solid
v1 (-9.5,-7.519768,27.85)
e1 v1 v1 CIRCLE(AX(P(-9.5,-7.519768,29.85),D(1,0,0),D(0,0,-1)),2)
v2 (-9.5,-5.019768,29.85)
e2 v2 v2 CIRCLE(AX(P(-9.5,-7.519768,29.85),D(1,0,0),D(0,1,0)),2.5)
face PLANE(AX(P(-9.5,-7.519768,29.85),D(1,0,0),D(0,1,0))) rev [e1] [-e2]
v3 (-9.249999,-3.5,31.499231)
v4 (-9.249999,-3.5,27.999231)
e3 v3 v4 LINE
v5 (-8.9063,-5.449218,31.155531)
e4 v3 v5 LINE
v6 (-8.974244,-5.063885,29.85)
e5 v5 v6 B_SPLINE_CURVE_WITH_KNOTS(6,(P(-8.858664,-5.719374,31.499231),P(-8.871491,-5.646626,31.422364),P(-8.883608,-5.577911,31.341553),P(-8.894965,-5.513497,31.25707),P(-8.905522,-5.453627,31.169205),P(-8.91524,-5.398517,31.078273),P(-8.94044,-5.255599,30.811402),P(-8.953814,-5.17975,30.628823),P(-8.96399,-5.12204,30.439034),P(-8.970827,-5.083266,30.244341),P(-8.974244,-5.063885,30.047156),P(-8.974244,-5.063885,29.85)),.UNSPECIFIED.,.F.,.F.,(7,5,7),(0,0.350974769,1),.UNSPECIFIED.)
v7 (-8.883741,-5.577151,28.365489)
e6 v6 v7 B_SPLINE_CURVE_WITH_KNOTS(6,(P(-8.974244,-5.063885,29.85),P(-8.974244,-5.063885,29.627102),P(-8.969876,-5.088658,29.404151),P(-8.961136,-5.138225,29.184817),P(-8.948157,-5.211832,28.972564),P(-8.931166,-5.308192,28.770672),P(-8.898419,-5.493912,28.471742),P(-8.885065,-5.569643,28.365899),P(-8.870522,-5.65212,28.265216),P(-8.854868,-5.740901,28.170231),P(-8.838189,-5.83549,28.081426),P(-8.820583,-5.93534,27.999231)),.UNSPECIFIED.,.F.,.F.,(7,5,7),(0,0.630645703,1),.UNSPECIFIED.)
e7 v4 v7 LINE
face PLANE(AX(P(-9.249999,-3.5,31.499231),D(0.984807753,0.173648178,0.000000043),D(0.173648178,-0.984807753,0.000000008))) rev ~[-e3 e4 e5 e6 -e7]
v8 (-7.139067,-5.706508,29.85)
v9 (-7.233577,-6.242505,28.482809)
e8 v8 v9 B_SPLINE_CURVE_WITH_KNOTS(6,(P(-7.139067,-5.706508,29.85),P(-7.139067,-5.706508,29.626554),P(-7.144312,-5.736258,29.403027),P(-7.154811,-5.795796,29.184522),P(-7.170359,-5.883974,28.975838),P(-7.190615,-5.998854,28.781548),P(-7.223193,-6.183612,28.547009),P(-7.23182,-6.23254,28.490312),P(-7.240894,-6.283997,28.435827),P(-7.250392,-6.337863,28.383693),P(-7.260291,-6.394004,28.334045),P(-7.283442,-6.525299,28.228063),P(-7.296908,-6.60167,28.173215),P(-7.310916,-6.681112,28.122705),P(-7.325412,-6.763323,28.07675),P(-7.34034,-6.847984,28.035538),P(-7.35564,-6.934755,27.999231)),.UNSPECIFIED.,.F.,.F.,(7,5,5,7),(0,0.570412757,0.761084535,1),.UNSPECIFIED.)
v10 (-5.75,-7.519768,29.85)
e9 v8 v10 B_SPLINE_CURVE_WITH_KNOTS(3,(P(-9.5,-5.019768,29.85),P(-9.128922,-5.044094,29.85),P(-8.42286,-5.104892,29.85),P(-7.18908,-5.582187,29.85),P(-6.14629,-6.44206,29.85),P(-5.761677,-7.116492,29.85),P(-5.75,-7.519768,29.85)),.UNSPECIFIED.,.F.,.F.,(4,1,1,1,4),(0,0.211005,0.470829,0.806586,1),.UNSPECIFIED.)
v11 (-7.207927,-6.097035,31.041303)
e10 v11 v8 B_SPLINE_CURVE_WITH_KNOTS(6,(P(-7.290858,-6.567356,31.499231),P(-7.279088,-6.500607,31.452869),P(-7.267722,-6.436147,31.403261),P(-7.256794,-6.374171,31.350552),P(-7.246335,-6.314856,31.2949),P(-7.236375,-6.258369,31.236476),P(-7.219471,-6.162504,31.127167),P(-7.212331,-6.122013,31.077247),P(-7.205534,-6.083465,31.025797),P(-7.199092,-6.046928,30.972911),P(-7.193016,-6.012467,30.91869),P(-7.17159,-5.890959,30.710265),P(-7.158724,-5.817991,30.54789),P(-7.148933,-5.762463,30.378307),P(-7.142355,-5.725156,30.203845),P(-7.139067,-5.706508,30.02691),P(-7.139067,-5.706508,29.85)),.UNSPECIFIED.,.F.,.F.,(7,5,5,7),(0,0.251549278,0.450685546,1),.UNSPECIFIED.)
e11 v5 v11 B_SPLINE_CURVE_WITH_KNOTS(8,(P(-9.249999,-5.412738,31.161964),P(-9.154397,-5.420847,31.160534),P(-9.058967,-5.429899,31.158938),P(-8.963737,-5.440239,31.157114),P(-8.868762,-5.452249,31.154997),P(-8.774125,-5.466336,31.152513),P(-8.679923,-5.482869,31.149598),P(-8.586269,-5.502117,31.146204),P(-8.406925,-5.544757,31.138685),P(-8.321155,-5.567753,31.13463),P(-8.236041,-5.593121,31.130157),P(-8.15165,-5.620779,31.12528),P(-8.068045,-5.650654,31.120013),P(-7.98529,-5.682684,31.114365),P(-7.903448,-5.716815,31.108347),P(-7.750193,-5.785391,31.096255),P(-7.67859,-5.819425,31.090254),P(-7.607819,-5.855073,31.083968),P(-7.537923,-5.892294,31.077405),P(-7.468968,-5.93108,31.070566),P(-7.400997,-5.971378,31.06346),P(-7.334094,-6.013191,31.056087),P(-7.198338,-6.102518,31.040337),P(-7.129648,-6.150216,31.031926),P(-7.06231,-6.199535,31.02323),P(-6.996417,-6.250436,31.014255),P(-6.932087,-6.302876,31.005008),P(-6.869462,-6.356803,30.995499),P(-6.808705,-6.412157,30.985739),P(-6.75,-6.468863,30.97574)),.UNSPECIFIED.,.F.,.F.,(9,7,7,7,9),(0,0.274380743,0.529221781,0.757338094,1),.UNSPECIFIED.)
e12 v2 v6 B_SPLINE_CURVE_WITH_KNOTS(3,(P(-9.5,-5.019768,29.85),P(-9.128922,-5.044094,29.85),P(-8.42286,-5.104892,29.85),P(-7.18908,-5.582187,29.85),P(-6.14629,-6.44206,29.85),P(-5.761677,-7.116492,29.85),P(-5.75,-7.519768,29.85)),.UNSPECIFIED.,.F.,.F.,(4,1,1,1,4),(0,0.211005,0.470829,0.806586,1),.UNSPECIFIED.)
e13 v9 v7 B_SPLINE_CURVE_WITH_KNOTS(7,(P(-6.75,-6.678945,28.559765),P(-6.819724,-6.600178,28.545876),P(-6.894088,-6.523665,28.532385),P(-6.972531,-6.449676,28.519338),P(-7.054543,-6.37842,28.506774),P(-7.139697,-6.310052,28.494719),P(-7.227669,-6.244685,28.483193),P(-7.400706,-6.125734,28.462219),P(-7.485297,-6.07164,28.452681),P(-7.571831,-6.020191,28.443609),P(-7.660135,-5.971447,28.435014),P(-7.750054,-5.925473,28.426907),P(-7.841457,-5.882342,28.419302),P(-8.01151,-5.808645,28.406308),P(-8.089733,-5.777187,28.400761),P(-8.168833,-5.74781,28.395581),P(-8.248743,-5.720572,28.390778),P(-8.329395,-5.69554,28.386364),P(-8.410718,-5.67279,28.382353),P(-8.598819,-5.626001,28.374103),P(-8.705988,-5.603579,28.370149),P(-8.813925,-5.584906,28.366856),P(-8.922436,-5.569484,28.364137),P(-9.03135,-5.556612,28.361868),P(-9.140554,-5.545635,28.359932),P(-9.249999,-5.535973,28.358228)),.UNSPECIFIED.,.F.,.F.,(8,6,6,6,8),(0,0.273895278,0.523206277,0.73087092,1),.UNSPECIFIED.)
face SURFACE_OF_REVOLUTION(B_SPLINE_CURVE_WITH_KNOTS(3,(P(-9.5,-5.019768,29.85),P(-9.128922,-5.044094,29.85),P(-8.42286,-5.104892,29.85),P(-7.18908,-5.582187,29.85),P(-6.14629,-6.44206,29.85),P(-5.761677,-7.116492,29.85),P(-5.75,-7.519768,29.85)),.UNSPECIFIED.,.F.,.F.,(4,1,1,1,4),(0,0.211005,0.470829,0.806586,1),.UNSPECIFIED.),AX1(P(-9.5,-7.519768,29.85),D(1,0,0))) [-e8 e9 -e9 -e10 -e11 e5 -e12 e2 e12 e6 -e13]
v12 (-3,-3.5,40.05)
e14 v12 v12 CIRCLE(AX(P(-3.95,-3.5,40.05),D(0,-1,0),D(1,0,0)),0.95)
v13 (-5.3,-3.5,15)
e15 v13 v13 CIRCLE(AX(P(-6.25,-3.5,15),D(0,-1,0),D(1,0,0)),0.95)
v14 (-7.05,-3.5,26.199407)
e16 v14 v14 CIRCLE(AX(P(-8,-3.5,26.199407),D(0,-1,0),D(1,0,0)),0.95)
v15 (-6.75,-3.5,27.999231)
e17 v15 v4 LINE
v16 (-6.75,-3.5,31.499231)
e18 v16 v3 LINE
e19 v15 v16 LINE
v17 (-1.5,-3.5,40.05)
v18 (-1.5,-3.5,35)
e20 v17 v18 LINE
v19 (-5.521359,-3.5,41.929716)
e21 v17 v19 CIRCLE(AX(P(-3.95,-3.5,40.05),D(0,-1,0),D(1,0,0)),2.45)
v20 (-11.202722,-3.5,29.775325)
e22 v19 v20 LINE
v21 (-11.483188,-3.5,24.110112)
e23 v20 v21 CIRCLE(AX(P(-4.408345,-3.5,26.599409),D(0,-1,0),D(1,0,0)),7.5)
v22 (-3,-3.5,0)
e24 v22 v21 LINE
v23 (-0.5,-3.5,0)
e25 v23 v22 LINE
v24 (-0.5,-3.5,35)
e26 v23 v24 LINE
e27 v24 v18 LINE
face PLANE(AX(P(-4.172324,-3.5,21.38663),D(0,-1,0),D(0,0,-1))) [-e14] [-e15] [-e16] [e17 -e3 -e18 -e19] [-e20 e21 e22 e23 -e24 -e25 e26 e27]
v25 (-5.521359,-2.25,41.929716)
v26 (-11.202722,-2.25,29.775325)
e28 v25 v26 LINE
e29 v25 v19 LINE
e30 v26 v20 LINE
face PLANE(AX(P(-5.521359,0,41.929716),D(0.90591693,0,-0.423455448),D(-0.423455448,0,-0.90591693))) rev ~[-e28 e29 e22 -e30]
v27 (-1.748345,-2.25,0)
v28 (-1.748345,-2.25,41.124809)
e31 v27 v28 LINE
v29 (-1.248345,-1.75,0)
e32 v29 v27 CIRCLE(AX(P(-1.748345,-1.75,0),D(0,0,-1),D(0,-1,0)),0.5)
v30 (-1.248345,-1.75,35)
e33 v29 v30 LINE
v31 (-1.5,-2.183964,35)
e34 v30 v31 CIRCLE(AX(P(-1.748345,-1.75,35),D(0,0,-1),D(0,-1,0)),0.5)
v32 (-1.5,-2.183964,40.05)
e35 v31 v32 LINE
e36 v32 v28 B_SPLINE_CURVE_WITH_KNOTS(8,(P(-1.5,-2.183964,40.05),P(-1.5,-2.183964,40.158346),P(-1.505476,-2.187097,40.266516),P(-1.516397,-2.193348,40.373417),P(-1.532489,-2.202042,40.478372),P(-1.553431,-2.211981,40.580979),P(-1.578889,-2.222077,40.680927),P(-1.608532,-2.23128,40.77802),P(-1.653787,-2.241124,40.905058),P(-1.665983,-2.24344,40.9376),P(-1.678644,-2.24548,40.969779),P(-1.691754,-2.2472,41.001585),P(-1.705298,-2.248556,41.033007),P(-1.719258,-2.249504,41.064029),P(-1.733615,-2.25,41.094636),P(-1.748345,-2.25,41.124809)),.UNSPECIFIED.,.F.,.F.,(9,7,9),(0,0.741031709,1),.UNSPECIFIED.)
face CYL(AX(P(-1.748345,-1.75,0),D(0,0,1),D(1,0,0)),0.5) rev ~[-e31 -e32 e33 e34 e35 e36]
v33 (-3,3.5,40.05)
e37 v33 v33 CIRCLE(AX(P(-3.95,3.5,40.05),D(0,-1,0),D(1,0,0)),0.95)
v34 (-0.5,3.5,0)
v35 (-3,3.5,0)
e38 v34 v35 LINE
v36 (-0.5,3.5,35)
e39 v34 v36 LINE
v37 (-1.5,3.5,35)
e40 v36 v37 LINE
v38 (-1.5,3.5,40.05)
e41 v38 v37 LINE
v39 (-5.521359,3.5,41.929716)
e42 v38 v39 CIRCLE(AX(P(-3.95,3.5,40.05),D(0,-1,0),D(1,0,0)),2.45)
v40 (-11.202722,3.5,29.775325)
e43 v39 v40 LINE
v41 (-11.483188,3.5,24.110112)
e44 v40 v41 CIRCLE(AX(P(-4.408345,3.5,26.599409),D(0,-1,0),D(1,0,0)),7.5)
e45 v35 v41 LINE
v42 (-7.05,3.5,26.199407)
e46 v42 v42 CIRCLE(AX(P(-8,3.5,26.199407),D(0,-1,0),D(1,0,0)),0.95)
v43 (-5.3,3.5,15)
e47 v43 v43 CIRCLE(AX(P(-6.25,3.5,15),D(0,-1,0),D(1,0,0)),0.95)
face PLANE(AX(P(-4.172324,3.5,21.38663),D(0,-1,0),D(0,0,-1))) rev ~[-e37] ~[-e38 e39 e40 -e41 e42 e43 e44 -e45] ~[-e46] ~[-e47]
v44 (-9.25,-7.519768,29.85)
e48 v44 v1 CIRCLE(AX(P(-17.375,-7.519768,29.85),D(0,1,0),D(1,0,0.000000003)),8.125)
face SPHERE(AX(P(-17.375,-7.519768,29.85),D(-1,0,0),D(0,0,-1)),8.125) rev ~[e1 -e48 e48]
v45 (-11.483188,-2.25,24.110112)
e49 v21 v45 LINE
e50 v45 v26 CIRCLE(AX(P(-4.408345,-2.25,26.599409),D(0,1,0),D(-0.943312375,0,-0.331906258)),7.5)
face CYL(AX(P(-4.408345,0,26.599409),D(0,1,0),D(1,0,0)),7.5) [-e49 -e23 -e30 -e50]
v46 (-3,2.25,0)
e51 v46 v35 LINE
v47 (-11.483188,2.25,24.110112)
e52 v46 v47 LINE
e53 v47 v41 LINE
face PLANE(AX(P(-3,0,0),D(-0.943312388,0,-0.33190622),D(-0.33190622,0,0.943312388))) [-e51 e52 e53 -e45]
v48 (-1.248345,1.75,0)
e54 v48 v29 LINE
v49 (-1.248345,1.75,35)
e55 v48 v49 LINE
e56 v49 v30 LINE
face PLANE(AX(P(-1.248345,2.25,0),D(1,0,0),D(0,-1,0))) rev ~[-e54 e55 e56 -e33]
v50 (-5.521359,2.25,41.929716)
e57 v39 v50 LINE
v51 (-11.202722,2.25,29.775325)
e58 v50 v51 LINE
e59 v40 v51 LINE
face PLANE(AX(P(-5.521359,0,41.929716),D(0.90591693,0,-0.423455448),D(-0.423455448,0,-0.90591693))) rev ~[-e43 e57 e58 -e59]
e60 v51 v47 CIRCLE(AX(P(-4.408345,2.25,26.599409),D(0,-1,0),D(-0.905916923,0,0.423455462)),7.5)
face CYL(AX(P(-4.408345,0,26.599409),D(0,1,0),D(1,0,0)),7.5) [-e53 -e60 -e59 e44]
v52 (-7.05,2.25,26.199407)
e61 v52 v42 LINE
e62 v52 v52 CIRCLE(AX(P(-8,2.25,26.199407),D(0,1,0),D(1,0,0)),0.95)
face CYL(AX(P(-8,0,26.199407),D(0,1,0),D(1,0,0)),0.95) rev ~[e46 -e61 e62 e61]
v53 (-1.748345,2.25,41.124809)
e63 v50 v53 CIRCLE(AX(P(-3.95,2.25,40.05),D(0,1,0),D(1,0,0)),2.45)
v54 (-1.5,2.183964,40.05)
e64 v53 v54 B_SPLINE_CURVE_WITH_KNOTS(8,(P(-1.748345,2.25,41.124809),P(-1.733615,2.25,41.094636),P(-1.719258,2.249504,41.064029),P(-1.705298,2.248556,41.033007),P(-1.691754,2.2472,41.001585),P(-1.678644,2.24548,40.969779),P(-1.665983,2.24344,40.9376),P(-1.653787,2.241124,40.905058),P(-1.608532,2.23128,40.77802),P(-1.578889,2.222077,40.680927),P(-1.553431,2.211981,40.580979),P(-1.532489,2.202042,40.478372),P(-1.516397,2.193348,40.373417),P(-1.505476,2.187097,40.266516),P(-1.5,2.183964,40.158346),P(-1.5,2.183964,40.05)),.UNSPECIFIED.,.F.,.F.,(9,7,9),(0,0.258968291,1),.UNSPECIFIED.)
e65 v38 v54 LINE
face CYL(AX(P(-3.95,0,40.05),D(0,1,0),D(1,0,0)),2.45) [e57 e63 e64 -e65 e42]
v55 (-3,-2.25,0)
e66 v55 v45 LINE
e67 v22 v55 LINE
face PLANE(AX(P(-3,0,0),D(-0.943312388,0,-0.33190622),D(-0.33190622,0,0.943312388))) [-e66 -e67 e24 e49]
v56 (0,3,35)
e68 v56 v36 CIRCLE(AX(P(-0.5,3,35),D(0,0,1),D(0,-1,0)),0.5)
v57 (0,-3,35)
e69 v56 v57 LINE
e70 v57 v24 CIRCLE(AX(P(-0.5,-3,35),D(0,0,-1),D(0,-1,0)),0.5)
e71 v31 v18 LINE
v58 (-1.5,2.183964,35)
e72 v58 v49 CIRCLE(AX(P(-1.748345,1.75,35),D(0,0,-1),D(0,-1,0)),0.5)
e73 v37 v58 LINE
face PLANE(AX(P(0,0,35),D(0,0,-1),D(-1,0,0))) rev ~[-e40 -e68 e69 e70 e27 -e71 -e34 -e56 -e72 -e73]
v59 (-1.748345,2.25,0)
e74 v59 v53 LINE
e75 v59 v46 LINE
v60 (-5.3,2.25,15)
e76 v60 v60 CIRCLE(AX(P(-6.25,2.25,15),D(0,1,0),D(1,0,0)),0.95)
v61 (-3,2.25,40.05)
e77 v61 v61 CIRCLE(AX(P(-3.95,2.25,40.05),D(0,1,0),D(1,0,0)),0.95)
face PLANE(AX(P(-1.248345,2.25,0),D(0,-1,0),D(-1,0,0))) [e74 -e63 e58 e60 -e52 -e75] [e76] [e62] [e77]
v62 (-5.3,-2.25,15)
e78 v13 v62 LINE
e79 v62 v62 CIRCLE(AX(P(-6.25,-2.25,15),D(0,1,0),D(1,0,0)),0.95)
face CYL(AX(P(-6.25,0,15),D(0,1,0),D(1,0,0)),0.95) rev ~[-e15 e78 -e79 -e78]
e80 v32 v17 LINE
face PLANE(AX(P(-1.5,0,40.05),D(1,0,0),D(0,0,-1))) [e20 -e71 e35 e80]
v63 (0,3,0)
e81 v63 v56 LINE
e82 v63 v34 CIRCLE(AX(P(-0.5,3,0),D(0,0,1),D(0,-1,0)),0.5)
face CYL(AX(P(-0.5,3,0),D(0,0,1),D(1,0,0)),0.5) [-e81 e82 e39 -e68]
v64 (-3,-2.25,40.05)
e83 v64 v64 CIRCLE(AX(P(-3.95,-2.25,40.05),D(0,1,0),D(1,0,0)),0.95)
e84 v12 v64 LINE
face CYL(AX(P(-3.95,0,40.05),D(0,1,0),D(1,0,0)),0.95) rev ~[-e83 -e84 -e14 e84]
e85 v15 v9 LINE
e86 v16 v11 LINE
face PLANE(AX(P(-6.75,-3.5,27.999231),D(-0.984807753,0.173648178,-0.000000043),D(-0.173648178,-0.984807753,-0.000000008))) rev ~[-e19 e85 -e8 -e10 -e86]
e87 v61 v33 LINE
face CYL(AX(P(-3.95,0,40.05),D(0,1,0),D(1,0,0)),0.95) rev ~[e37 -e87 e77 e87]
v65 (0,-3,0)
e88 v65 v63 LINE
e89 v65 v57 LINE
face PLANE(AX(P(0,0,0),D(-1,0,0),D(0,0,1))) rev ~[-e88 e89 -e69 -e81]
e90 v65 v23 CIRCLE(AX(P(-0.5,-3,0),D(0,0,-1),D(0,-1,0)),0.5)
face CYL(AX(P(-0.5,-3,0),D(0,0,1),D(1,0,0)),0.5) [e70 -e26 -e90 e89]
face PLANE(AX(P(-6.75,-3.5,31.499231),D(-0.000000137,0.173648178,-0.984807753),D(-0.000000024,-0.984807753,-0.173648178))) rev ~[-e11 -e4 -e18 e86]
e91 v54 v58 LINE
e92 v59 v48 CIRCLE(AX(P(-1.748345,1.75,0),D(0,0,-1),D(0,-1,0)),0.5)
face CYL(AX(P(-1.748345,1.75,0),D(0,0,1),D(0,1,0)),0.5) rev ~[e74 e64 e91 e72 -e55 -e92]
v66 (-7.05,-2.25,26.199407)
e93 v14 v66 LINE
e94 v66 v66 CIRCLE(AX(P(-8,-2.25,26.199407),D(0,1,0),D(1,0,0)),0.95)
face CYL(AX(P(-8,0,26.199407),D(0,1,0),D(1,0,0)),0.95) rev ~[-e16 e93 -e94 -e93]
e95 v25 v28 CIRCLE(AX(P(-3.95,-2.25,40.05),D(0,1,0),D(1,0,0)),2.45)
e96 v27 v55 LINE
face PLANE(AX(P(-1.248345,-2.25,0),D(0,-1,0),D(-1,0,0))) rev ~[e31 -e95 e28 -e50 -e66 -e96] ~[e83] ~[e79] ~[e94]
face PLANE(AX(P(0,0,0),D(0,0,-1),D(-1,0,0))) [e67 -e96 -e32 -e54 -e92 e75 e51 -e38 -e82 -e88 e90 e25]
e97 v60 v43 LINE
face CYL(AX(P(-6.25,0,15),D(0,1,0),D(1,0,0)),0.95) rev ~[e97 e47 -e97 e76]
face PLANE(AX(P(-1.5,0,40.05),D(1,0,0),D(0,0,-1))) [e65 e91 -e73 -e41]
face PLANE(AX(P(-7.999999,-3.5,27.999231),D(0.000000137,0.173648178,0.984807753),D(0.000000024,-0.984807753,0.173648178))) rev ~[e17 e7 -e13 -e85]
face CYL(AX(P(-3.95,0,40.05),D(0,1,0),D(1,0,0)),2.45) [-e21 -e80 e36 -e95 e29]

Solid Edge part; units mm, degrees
sketch "Sketch1" plane through (0, 0, 0) normal (0, -1, 0) x (1, 0, 0)
  line L0 (0, 0) -> (0, 35)
  line L1 (0, 35) -> (-1.5, 35)
  line L2 (-1.5, 40.05) -> (-1.5, 35)
  arc A0 (-1.5, 40.05) -> (-5.521359, 41.929716) centre (-3.95, 40.05) ccw
  line L3 (-5.521359, 41.929716) -> (-11.202722, 29.775325)
  arc A1 (-11.202722, 29.775325) -> (-11.483188, 24.110112) centre (-4.408345, 26.599409) ccw
  line L4 (-3, 0) -> (-11.483188, 24.110112)
  line L5 (0, 0) -> (-3, 0)
  circle A2 centre (-3.95, 40.05) radius 0.95
  circle A3 centre (-6.25, 15) radius 0.95
  circle A4 centre (-8, 26.199407) radius 0.95
extrude "Protrusion1" add sketch "Sketch1" along normal mid plane 7
sketch "Sketch2" plane through (-1.5, 0, 0) normal (0, 0, -1) x (0, 1, 0)
  line L0 (2.25, 0.251655) -> (-2.25, 0.251655)
  line L1 (-2.25, 0.251655) -> (-2.25, -10.408345)
  line L2 (2.25, -10.408345) -> (-2.25, -10.408345)
  line L3 (2.25, 0.251655) -> (2.25, -10.408345)
extrude "ExtrudedCutout_1" cut sketch "Sketch2" against normal blind 43.130726
fillet "Round_1" radius 0.5 4 edges at (0, 3.5, 17.5) (0, -3.5, 17.5) (-1.248345, -2.25, 17.5) (-1.248345, 2.25, 17.5)
sketch "Sketch3" plane through (-6.204172, -3.5, 21.25) normal (0, -1, 0) x (0.4234554, 0, 0.9059169)
  line L0 (5.35379, 4.484869) -> (5.883109, 3.352473)
  line L1 (5.883109, 3.352473) -> (9.053818, 4.834567)
  line L2 (9.053818, 4.834567) -> (7.99518, 7.099359)
  line L3 (7.99518, 7.099359) -> (4.824471, 5.617265)
  line L4 (4.824471, 5.617265) -> (5.35379, 4.484869)
extrude "ExtrudedProtrusion_3" add sketch "Sketch3" along normal blind 4 draft 10
sketch "Sketch4" plane through (-1.5, 0, 29.85) normal (0, 0, -1) x (1, 0, 0)
  line L0 (-8, 7.519768) -> (-8, 5.019768)
  spline S0 degree 3 poles (-8, 5.019768) (-7.628922, 5.044094) (-6.92286, 5.104892) (-5.68908, 5.582187) (-4.64629, 6.44206) (-4.261677, 7.116492) (-4.25, 7.519768) knots 0 0 0 0 0.211005 0.470829 0.806586 1 1 1 1
revolve "RevolvedProtrusion_2" add sketch "Sketch4" angle 360 about axis through (-9.5, -7.519768, 29.85) along (1, 0, 0)
sketch "Sketch5" plane through (-6.204172, -7.519768, 21.25) normal (0, -1, 0) x (0.4234554, 0, 0.9059169)
  line L0 (6.39525, 6.627463) -> (4.583416, 5.780552)
  arc A0 (6.501113, 6.400984) -> (4.583416, 5.780552) centre (3.060538, 13.761559) cw
revolve "RevolvedCutout1" cut sketch "Sketch5" angle 360 about axis through (-9.5, -7.519768, 29.85) along (1, 0, 0)
properties material "Stainless Steel, 420"
